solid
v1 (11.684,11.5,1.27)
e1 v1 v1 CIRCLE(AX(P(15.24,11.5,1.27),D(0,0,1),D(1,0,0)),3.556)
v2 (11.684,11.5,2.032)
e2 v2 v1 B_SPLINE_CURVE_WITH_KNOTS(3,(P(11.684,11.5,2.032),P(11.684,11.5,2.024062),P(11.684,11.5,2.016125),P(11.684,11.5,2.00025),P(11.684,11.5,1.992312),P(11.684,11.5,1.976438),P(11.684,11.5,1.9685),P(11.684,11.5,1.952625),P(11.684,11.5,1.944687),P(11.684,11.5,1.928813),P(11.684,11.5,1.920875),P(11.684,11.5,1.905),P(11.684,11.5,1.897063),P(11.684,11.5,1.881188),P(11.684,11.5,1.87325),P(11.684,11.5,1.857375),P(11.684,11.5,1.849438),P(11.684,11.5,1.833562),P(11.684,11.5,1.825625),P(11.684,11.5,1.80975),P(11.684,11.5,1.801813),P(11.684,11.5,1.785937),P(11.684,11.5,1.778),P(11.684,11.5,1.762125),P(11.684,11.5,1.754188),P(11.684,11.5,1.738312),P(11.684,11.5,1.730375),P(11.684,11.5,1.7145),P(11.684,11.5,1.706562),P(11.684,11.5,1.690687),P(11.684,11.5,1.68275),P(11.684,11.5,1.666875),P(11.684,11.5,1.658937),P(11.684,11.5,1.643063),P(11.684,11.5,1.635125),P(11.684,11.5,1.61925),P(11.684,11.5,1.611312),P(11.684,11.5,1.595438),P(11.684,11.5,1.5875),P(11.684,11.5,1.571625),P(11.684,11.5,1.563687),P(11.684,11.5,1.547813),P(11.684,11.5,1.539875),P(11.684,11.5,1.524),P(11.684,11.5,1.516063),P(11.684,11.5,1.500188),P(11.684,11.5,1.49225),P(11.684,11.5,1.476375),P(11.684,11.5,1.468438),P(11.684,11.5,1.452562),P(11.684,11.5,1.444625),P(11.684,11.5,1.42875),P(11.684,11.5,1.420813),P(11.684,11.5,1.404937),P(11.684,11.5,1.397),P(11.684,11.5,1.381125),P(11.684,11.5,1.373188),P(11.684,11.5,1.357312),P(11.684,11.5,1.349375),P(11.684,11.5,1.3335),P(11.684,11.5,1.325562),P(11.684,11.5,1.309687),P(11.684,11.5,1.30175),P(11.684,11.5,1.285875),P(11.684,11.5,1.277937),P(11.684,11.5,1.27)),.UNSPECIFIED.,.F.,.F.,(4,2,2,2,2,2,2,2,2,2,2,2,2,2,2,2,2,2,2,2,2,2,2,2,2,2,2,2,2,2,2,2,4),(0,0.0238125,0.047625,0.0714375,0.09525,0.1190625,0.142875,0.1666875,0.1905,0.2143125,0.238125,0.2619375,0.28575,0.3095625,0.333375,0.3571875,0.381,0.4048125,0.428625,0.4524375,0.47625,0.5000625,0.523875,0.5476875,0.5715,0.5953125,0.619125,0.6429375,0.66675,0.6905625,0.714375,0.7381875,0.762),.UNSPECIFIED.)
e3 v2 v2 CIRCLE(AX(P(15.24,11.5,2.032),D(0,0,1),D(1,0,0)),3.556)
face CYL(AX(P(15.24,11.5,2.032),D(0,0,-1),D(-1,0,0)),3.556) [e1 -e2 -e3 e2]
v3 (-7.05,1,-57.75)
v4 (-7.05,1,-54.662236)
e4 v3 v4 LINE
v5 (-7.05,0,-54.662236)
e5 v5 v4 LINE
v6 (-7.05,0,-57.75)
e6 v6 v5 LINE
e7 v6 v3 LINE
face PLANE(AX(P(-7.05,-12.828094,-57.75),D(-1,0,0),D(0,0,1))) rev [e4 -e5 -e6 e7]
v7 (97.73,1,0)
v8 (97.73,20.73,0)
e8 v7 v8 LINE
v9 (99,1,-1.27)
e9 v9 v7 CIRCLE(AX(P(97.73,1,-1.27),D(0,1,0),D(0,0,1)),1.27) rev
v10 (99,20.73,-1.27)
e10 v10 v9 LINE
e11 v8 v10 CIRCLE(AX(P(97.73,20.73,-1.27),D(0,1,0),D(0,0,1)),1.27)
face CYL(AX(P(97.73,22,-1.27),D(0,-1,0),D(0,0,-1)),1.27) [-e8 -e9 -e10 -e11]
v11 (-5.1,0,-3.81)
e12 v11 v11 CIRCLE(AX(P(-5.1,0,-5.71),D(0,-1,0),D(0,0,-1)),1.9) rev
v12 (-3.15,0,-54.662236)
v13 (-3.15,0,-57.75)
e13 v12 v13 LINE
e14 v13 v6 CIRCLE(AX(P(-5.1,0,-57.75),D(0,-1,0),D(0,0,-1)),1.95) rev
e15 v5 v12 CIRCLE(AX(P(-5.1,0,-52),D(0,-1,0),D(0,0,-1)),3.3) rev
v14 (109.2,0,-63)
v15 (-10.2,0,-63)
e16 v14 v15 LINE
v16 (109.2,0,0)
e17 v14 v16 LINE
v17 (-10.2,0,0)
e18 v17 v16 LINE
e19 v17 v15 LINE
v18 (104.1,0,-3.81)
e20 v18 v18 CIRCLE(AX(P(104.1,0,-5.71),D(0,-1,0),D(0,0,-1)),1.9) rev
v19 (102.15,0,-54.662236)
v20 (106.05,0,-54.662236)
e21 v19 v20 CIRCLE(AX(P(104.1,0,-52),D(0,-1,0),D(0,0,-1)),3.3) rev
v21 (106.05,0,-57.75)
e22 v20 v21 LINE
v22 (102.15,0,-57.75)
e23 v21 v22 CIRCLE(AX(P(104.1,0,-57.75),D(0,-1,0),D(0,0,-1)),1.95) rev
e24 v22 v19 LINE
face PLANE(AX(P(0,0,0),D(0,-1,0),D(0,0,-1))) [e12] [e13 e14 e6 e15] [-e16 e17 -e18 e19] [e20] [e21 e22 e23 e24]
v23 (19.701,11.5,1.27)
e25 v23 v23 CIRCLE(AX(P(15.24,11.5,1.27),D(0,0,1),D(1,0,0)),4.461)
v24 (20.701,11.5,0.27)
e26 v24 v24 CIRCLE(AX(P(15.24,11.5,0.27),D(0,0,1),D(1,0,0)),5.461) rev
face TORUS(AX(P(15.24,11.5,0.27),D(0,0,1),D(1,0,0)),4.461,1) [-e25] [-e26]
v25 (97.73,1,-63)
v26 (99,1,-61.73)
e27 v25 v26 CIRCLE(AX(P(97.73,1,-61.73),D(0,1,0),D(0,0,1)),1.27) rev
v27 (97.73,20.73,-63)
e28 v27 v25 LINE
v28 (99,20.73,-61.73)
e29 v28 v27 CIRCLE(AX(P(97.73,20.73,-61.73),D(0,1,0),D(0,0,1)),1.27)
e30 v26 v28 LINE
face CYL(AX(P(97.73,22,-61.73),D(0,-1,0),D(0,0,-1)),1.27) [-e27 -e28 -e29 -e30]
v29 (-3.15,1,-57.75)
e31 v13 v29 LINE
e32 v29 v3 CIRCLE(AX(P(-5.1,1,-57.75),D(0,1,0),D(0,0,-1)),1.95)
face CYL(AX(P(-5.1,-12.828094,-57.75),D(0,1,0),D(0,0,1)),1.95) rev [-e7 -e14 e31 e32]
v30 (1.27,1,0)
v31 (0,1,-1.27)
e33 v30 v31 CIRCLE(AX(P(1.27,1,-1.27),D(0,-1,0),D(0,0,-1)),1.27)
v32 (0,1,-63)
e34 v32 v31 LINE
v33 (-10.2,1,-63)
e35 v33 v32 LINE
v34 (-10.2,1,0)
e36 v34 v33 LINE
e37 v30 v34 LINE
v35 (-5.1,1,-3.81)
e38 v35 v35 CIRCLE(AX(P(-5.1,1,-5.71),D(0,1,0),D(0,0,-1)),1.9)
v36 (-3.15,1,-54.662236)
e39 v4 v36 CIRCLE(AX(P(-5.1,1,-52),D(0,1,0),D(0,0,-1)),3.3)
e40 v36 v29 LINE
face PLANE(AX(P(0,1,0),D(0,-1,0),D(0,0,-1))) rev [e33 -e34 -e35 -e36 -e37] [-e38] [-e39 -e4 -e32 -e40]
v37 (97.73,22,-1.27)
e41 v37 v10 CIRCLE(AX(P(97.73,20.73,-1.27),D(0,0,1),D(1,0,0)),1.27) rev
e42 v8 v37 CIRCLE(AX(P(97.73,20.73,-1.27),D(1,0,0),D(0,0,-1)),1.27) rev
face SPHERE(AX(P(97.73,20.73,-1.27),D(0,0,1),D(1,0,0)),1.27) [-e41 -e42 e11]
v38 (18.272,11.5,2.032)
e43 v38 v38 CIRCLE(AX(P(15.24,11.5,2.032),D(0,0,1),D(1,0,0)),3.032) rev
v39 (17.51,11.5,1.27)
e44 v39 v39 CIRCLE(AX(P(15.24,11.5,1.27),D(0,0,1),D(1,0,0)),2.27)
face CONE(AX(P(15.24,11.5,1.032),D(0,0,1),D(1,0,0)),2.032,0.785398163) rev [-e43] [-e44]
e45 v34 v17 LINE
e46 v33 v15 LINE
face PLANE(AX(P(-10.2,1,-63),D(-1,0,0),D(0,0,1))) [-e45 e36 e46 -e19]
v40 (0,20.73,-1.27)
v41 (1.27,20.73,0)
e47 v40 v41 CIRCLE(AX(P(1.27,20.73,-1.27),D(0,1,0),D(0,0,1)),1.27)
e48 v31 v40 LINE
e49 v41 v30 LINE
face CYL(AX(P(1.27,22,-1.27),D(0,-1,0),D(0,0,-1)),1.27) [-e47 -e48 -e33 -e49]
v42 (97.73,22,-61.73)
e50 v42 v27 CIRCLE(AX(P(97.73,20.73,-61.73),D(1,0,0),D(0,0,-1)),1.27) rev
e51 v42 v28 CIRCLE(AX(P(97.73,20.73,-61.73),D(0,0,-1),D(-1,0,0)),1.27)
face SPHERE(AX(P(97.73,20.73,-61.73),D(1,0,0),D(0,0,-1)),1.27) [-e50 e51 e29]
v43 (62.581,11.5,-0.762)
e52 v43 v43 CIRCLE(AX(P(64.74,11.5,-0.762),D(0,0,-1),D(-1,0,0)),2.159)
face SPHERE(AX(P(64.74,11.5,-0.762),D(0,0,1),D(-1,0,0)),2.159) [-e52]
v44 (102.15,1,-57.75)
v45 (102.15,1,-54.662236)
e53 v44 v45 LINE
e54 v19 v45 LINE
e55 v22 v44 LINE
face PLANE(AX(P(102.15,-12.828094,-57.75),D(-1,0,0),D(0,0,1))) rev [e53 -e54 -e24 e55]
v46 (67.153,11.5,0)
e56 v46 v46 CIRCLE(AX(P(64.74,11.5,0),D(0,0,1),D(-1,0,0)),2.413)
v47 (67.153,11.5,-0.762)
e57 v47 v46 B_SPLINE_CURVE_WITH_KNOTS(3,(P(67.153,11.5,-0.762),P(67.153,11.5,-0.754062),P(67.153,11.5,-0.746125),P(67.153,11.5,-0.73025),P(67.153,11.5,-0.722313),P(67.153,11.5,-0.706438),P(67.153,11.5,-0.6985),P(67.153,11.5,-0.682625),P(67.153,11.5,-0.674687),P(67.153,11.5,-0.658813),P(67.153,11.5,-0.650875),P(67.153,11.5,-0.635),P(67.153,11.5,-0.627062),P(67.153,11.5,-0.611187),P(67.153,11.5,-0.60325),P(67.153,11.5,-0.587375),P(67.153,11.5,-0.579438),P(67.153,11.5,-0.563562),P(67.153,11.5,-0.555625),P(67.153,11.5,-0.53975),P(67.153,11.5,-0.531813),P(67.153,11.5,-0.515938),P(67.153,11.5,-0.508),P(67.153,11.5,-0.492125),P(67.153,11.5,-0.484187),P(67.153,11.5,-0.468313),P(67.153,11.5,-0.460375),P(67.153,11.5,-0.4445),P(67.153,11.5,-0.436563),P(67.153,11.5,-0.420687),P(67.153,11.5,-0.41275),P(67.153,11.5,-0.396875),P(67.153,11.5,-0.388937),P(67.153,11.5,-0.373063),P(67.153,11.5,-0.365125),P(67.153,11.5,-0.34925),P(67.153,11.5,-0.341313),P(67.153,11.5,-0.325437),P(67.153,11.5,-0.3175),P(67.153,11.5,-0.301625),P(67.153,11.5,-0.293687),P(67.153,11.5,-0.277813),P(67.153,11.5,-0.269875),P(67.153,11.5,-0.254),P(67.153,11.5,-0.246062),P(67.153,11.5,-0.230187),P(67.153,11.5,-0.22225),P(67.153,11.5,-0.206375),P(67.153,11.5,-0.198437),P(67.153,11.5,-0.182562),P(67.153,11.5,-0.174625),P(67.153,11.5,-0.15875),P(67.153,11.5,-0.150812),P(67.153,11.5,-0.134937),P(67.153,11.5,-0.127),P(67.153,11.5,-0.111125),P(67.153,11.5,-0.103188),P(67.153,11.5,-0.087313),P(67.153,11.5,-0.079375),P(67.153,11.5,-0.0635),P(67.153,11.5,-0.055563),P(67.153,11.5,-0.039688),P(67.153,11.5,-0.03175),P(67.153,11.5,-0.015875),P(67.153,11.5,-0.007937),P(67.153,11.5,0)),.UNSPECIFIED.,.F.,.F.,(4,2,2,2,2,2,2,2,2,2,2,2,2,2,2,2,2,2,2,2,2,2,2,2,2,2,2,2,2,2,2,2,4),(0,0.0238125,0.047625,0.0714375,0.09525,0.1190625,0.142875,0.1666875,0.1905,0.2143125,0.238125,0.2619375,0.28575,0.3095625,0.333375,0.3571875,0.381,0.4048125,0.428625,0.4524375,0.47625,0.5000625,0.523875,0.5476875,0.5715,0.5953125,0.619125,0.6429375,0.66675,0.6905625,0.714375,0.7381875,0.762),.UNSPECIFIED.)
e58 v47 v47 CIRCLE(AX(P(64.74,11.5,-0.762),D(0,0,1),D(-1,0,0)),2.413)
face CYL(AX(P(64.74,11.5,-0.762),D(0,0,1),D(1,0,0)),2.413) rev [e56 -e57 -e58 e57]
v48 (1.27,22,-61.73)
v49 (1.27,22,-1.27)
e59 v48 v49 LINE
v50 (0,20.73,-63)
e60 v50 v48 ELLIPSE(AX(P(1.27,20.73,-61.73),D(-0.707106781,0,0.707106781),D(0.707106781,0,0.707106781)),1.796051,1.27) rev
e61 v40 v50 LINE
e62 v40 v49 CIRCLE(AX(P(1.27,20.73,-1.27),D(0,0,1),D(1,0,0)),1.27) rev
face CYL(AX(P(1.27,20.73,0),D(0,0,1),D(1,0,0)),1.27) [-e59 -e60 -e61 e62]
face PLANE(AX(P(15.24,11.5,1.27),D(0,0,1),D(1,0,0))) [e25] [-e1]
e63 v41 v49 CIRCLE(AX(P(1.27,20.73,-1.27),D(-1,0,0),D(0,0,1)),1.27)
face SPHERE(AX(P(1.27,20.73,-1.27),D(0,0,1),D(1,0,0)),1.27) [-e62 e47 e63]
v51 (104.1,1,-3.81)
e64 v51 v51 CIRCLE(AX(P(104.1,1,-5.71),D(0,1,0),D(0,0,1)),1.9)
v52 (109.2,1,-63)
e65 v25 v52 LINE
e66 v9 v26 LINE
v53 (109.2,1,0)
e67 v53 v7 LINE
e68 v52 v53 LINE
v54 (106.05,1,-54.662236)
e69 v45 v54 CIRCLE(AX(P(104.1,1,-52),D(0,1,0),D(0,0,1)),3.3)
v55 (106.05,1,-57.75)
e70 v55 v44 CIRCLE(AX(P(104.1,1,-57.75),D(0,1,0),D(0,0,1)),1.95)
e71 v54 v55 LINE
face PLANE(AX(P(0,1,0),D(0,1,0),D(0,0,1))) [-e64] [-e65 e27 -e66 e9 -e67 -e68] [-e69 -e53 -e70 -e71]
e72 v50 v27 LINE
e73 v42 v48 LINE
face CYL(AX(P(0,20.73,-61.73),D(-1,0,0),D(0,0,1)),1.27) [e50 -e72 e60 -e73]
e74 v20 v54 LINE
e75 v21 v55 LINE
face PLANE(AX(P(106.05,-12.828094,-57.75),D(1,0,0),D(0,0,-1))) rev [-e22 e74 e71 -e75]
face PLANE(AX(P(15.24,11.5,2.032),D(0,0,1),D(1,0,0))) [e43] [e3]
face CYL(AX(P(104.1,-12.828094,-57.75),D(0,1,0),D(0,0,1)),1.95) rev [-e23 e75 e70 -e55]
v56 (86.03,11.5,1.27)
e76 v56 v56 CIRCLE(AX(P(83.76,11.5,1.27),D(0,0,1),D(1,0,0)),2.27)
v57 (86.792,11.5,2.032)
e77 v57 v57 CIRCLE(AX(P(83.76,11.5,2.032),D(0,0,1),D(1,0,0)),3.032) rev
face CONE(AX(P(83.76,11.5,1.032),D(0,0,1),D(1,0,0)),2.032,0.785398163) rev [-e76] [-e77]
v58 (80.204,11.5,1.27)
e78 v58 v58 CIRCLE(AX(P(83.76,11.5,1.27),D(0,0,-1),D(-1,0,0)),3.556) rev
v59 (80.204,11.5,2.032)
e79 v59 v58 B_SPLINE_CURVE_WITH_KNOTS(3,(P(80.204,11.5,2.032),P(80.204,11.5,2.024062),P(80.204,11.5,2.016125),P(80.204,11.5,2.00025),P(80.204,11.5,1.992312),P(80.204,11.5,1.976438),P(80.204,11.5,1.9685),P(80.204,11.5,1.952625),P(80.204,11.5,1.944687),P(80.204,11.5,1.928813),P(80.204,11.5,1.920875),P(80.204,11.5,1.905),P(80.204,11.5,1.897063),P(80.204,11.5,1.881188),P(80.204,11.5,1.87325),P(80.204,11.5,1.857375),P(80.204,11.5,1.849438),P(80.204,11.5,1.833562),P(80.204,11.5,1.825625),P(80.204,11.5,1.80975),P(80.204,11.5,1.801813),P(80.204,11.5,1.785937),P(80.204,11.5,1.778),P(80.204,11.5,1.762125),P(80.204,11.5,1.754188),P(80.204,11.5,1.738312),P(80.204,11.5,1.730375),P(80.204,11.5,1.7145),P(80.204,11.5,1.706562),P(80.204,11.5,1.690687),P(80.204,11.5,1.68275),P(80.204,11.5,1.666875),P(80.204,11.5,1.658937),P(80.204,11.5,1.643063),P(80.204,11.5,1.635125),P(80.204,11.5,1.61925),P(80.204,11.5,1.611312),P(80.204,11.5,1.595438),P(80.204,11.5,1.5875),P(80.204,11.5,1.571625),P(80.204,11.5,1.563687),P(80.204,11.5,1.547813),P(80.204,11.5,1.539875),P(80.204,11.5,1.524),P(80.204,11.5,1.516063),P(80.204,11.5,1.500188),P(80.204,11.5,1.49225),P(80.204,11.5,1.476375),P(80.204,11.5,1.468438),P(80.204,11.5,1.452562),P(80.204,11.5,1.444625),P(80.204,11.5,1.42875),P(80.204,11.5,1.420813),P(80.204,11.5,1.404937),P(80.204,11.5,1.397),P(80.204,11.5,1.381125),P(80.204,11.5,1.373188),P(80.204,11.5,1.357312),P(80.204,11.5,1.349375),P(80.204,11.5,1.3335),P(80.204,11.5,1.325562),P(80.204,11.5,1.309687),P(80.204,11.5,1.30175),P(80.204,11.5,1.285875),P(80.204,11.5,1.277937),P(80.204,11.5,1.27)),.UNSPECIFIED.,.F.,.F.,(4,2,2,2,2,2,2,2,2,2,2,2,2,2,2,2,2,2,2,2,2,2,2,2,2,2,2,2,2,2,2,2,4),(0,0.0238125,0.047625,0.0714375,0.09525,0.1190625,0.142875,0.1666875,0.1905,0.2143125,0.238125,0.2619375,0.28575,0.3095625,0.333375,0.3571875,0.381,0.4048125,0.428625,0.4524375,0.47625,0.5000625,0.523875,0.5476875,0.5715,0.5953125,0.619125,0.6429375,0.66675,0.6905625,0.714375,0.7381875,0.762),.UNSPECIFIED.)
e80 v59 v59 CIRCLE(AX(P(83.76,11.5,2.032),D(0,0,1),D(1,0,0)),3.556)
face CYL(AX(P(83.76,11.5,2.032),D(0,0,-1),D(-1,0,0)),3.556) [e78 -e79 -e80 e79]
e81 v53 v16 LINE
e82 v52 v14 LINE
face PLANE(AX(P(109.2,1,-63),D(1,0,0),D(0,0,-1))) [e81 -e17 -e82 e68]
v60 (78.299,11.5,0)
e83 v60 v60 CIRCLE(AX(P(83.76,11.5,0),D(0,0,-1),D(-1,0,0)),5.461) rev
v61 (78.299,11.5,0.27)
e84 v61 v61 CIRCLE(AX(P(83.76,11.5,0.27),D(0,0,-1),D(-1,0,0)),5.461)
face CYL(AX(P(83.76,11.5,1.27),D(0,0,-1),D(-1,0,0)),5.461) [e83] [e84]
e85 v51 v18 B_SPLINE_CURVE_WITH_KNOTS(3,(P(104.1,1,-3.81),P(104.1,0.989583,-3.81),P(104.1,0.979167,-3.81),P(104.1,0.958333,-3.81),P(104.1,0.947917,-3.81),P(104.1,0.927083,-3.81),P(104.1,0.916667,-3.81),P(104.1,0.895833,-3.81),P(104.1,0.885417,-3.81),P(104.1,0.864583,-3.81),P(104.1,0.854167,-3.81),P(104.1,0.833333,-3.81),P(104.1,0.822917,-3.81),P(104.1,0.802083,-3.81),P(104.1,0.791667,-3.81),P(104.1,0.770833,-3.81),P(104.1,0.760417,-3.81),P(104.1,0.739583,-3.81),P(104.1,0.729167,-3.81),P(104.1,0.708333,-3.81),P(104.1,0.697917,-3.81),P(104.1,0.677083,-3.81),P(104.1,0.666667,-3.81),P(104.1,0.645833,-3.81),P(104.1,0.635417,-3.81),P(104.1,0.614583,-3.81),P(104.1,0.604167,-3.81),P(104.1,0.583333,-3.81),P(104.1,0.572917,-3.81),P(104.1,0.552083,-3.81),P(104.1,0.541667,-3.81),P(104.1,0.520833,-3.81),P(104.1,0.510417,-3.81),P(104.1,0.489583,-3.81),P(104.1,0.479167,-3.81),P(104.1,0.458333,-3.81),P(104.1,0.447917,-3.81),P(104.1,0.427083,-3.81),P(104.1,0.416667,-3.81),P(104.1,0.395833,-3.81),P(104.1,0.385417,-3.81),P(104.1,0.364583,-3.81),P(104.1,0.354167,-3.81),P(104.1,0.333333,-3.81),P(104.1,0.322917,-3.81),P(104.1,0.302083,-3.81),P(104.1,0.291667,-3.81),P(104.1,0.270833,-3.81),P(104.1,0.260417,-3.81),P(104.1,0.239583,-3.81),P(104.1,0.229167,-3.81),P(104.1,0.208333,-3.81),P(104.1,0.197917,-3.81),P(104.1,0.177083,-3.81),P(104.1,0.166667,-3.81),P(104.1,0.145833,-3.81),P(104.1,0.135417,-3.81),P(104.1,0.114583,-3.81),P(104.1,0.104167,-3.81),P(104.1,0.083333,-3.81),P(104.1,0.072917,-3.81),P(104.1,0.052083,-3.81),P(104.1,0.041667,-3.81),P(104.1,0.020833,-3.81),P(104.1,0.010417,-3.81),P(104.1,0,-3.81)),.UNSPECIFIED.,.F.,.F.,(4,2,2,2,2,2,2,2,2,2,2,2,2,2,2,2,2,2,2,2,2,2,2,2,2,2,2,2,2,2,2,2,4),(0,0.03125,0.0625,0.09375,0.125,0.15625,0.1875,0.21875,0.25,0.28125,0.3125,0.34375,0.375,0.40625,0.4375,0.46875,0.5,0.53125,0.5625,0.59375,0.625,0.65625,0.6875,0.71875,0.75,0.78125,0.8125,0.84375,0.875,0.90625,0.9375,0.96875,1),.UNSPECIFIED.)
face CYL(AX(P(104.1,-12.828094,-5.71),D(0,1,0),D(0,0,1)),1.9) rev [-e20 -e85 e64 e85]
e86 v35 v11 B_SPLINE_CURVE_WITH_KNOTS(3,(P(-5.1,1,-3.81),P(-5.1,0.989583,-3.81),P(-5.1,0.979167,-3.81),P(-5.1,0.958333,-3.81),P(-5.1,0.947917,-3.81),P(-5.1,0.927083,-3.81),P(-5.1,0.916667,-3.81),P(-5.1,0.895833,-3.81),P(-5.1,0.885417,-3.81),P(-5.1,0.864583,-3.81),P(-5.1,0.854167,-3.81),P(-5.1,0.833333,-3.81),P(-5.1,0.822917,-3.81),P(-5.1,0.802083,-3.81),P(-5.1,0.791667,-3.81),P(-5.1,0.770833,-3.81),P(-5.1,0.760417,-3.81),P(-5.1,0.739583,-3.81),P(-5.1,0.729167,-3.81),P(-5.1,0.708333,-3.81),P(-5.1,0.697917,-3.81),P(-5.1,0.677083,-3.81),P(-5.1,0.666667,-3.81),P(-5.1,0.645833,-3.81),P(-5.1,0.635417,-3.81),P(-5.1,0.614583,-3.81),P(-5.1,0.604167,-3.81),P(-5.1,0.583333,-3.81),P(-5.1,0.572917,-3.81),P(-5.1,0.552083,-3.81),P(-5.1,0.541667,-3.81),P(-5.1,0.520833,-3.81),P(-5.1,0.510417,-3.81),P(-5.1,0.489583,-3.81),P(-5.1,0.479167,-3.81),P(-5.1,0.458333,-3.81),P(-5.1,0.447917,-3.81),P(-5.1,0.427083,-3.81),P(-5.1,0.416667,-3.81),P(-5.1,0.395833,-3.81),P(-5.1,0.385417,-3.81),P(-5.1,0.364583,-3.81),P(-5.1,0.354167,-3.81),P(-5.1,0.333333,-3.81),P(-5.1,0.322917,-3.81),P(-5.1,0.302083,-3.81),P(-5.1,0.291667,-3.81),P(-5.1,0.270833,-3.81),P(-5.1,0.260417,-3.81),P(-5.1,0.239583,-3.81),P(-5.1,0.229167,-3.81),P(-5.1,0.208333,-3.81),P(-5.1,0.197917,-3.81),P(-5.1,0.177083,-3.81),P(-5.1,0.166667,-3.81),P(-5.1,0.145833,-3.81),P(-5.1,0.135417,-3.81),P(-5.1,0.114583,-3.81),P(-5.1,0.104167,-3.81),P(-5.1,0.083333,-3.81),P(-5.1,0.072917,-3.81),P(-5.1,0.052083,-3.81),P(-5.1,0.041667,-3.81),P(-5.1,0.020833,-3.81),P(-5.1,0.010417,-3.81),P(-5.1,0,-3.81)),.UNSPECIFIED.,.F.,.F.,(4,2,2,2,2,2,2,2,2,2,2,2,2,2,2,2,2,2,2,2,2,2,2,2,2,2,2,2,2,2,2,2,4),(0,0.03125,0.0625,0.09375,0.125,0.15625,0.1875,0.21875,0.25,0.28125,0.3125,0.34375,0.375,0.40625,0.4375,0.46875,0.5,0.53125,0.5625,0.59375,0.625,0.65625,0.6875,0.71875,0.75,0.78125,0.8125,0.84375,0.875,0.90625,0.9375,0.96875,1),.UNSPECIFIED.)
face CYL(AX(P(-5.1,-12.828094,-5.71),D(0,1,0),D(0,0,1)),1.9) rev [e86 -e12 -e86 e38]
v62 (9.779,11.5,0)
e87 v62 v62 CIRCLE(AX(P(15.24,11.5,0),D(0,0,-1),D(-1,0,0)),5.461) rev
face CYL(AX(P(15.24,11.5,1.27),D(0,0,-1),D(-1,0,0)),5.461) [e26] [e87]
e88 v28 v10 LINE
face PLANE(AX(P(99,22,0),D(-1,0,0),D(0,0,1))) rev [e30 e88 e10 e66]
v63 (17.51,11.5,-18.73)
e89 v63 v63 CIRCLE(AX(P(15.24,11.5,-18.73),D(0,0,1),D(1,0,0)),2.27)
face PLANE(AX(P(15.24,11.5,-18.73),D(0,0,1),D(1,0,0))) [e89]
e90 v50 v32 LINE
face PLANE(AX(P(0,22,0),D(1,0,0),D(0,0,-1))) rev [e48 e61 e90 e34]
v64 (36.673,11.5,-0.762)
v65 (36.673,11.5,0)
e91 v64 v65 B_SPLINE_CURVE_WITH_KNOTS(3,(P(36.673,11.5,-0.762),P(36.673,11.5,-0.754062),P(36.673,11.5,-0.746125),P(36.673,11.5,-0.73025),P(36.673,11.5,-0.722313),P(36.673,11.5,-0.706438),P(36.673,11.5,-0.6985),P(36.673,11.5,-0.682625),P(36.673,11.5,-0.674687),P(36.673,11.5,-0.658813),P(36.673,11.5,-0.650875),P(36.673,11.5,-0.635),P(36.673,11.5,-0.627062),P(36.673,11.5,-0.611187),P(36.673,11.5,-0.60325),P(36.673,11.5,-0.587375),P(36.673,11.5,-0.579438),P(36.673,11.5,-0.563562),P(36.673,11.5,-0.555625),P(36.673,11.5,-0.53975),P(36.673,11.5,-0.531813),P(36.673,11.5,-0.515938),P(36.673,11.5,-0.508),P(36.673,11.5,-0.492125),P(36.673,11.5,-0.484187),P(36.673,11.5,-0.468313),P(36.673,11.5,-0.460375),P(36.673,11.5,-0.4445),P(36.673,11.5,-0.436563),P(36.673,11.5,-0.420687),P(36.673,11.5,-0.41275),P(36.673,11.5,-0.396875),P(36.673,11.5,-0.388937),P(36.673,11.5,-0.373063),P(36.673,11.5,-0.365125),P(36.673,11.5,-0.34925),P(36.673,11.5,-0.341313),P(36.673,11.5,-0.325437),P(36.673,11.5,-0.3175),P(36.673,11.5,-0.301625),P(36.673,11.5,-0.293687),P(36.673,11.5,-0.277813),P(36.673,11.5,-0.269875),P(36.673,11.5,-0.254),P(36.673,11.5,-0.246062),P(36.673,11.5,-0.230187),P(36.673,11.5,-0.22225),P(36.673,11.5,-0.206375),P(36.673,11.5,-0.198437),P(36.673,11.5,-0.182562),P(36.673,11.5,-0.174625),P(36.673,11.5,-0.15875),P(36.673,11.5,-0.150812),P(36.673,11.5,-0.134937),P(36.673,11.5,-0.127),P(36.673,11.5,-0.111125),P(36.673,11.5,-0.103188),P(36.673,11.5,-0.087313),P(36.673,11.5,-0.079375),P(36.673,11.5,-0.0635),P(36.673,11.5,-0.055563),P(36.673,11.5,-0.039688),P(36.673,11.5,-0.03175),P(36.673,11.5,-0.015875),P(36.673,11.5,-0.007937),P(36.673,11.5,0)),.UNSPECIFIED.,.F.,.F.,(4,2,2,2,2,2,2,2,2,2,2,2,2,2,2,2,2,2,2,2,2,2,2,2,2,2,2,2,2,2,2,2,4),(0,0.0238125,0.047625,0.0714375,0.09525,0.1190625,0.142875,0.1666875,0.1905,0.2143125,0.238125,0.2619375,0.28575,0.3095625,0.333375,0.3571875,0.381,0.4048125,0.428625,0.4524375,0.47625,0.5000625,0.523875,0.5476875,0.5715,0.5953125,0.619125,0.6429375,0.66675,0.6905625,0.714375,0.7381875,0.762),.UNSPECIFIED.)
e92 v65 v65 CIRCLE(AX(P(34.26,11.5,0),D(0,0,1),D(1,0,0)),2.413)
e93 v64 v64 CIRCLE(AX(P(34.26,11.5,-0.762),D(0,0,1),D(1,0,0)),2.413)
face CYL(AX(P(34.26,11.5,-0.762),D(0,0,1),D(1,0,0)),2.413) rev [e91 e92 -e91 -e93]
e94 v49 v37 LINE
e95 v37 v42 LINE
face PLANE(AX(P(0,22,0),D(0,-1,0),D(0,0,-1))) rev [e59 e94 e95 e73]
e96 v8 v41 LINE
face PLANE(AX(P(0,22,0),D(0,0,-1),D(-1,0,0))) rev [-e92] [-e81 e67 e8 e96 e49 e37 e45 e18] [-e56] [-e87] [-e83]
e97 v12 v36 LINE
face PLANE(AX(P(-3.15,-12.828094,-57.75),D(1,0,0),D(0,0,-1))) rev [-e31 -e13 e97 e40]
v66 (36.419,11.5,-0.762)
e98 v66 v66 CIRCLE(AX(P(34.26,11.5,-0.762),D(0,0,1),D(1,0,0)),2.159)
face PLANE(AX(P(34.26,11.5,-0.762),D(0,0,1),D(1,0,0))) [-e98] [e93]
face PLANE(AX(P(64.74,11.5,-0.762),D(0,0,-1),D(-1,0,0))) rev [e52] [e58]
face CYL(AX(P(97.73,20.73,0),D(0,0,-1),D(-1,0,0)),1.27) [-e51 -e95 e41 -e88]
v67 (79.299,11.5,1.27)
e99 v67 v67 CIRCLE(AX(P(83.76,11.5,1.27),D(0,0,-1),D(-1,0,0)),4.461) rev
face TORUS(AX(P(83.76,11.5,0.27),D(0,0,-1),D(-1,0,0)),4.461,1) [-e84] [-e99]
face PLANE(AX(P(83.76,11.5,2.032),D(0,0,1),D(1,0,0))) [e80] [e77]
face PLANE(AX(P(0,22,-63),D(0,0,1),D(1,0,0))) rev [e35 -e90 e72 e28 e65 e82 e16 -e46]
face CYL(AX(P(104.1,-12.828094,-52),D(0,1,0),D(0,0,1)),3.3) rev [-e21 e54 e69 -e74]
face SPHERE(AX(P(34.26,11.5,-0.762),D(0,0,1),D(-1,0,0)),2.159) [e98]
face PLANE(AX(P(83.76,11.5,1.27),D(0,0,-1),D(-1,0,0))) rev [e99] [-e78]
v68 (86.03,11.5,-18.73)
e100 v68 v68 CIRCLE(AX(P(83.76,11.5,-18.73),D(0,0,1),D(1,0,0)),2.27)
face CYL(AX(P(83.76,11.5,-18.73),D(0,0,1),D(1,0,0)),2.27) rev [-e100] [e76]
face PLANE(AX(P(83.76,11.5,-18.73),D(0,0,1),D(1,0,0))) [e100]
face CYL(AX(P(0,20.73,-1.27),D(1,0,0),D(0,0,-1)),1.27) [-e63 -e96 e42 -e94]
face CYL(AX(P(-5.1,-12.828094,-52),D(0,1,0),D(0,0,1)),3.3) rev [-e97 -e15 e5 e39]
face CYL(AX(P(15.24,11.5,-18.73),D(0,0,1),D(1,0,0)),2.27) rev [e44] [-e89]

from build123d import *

# Parameters (mm, degrees)
SKETCH1_W           = 99
SKETCH1_H           = 63
BOSS_EXTRUDE1_DEPTH = 22
SKETCH5_W           = 10.2
SKETCH5_H           = 63
BOSS_EXTRUDE3_DEPTH = 1
SKETCH7_R           = 1.9
CUT_EXTRUDE2_DEPTH  = 1
SKETCH8_R           = 5.461
BOSS_EXTRUDE4_DEPTH = 1.27
SKETCH9_R           = 3.556
SKETCH9_R_2         = 2.032
BOSS_EXTRUDE5_DEPTH = 0.762
FILLET1_R           = 1
CHAMFER1_SIZE       = 1
SKETCH10_R          = 2.27
CUT_EXTRUDE3_DEPTH  = 20
SKETCH11_R          = 2.413
CUT_EXTRUDE4_DEPTH  = 0.762
FILLET3_R           = 1.27


with BuildPart() as part:
    # Sketch1 → Boss-Extrude1 (new body)
    with BuildSketch(Plane(origin=(0, 0, 0), x_dir=(1, 0, 0), z_dir=(0, 1, 0))):
        with Locations((49.5, 31.5)):
            Rectangle(SKETCH1_W, SKETCH1_H)
    extrude(amount=BOSS_EXTRUDE1_DEPTH)

    # Sketch5 → Boss-Extrude3 (add)
    with BuildSketch(Plane.XZ):
        with Locations((-5.1, -31.5)):
            Rectangle(SKETCH5_W, SKETCH5_H)
        with Locations((104.1, -31.5)):
            Rectangle(SKETCH5_W, SKETCH5_H)
    extrude(amount=-BOSS_EXTRUDE3_DEPTH)

    # Sketch7 → Cut-Extrude2 (cut)
    with BuildSketch(Plane(origin=(0, 1, 0), x_dir=(1, 0, 0), z_dir=(0, 1, 0))):
        with Locations(Location((104.1, 5.71, 0), (0, 0, 270))):
            Circle(SKETCH7_R)
        with Locations(Location((-5.1, 5.71, 0), (0, 0, 270))):
            Circle(SKETCH7_R)
        with BuildLine():
            Line((102.15, 57.75), (102.15, 54.662235902))
            ThreePointArc((102.15, 54.662235902), (104.1, 48.7), (106.05, 54.662235902))
            Line((106.05, 54.662235902), (106.05, 57.75))
            ThreePointArc((106.05, 57.75), (104.1, 59.7), (102.15, 57.75))
        make_face()
        with BuildLine():
            Line((-7.05, 57.75), (-7.05, 54.662235902))
            ThreePointArc((-7.05, 54.662235902), (-5.1, 48.7), (-3.15, 54.662235902))
            Line((-3.15, 54.662235902), (-3.15, 57.75))
            ThreePointArc((-3.15, 57.75), (-5.1, 59.7), (-7.05, 57.75))
        make_face()
    extrude(amount=-CUT_EXTRUDE2_DEPTH, mode=Mode.SUBTRACT)

    # Sketch8 → Boss-Extrude4 (add)
    with BuildSketch(Plane.XY):
        with Locations(Location((15.24, 11.5, 0), (0, 0, 180))):
            Circle(SKETCH8_R)
        with Locations(Location((83.76, 11.5, 0), (0, 0, 180))):
            Circle(SKETCH8_R)
    extrude(amount=BOSS_EXTRUDE4_DEPTH)

    # Sketch9 → Boss-Extrude5 (add)
    # profile 1 of 2: a face of its own
    with BuildSketch(Plane.XY.offset(1.27)):
        with Locations(Location((15.24, 11.5, 0), (0, 0, 180))):
            Circle(SKETCH9_R)
        with Locations(Location((15.24, 11.5, 0), (0, 0, 180))):
            Circle(SKETCH9_R_2, mode=Mode.SUBTRACT)
    # profile 2 of 2: a face of its own
    with BuildSketch(Plane.XY.offset(1.27)):
        with Locations(Location((83.76, 11.5, 0), (0, 0, 180))):
            Circle(SKETCH9_R)
        with Locations(Location((83.76, 11.5, 0), (0, 0, 180))):
            Circle(SKETCH9_R_2, mode=Mode.SUBTRACT)
    extrude(amount=BOSS_EXTRUDE5_DEPTH)

    # Fillet1
    fillet1_edges = [part.edges().sort_by_distance(p)[0] for p in [
        (20.701, 11.5, 1.27),
        (89.221, 11.5, 1.27),
    ]]
    fillet(fillet1_edges, radius=FILLET1_R)

    # Chamfer1
    # the kernel refuses this chamfer: 1 mm, written as the material it takes off along each edge
    with BuildSketch(Plane(origin=(83.76, 11.5, 2.032), x_dir=(-1, 0, 0), z_dir=(0, 1, 0))) as chamfer1_piece_1_section:
        Polygon((2.032 + CHAMFER1_SIZE, 0), (2.032, -CHAMFER1_SIZE), (2.032, 0), align=None)
    chamfer1_piece_1 = revolve(axis=Axis((83.76, 11.5, 2.032), (0, 0, 1)), mode=Mode.PRIVATE)
    chamfer1_piece_1 = split(chamfer1_piece_1, bisect_by=Plane(origin=(86.411200438, 11.5, 1.27), z_dir=(0, 0, 1)), keep=Keep.TOP, mode=Mode.PRIVATE)
    add(chamfer1_piece_1, mode=Mode.SUBTRACT)
    with BuildSketch(Plane(origin=(15.24, 11.5, 2.032), x_dir=(-1, 0, 0), z_dir=(0, 1, 0))) as chamfer1_piece_2_section:
        Polygon((2.032 + CHAMFER1_SIZE, 0), (2.032, -CHAMFER1_SIZE), (2.032, 0), align=None)
    chamfer1_piece_2 = revolve(axis=Axis((15.24, 11.5, 2.032), (0, 0, 1)), mode=Mode.PRIVATE)
    chamfer1_piece_2 = split(chamfer1_piece_2, bisect_by=Plane(origin=(17.891200438, 11.5, 1.27), z_dir=(0, 0, 1)), keep=Keep.TOP, mode=Mode.PRIVATE)
    add(chamfer1_piece_2, mode=Mode.SUBTRACT)

    # Sketch10 → Cut-Extrude3 (cut)
    with BuildSketch(Plane.XY.offset(1.27)):
        with Locations((15.24, 11.5)):
            Circle(SKETCH10_R)
        with Locations((83.76, 11.5)):
            Circle(SKETCH10_R)
    extrude(amount=-CUT_EXTRUDE3_DEPTH, mode=Mode.SUBTRACT)

    # Sketch11 → Cut-Extrude4 (cut)
    with BuildSketch(Plane.XY):
        with Locations((34.26, 11.5)):
            Circle(SKETCH11_R)
        with Locations((64.74, 11.5)):
            Circle(SKETCH11_R)
    extrude(amount=-CUT_EXTRUDE4_DEPTH, mode=Mode.SUBTRACT)

    # Sketch13 → Revolve1 (revolve)
    with BuildSketch(Plane(origin=(34.26, 11.5, -0.762), x_dir=(1, 0, 0), z_dir=(0, 1, 0))):
        with BuildLine():
            Line((0, 2.159), (0, -2.159))
            ThreePointArc((0, -2.159), (2.159, 0), (0, 2.159))
        make_face()
    revolve(axis=Axis((34.26, 11.5, -2.921), (0, 0, -1)))

    # Sketch15 → Revolve2 (revolve)
    with BuildSketch(Plane(origin=(34.26, 11.5, -0.762), x_dir=(1, 0, 0), z_dir=(0, 1, 0))):
        with BuildLine():
            Line((30.48, -2.159), (30.48, 2.159))
            ThreePointArc((30.48, 2.159), (32.639, 0), (30.48, -2.159))
        make_face()
    revolve(axis=Axis((64.74, 11.5, -2.921), (0, 0, -1)))

    # Fillet3
    fillet3_edges = [part.edges().sort_by_distance(p)[0] for p in [
        (99, 22, -31.5),
        (49.5, 22, -63),
        (0, 22, -31.5),
        (99, 11.5, -63),
        (99, 11.5, 0),
        (0, 11.5, 0),
        (49.5, 22, 0),
    ]]
    fillet(fillet3_edges, radius=FILLET3_R)


solid = part.part
